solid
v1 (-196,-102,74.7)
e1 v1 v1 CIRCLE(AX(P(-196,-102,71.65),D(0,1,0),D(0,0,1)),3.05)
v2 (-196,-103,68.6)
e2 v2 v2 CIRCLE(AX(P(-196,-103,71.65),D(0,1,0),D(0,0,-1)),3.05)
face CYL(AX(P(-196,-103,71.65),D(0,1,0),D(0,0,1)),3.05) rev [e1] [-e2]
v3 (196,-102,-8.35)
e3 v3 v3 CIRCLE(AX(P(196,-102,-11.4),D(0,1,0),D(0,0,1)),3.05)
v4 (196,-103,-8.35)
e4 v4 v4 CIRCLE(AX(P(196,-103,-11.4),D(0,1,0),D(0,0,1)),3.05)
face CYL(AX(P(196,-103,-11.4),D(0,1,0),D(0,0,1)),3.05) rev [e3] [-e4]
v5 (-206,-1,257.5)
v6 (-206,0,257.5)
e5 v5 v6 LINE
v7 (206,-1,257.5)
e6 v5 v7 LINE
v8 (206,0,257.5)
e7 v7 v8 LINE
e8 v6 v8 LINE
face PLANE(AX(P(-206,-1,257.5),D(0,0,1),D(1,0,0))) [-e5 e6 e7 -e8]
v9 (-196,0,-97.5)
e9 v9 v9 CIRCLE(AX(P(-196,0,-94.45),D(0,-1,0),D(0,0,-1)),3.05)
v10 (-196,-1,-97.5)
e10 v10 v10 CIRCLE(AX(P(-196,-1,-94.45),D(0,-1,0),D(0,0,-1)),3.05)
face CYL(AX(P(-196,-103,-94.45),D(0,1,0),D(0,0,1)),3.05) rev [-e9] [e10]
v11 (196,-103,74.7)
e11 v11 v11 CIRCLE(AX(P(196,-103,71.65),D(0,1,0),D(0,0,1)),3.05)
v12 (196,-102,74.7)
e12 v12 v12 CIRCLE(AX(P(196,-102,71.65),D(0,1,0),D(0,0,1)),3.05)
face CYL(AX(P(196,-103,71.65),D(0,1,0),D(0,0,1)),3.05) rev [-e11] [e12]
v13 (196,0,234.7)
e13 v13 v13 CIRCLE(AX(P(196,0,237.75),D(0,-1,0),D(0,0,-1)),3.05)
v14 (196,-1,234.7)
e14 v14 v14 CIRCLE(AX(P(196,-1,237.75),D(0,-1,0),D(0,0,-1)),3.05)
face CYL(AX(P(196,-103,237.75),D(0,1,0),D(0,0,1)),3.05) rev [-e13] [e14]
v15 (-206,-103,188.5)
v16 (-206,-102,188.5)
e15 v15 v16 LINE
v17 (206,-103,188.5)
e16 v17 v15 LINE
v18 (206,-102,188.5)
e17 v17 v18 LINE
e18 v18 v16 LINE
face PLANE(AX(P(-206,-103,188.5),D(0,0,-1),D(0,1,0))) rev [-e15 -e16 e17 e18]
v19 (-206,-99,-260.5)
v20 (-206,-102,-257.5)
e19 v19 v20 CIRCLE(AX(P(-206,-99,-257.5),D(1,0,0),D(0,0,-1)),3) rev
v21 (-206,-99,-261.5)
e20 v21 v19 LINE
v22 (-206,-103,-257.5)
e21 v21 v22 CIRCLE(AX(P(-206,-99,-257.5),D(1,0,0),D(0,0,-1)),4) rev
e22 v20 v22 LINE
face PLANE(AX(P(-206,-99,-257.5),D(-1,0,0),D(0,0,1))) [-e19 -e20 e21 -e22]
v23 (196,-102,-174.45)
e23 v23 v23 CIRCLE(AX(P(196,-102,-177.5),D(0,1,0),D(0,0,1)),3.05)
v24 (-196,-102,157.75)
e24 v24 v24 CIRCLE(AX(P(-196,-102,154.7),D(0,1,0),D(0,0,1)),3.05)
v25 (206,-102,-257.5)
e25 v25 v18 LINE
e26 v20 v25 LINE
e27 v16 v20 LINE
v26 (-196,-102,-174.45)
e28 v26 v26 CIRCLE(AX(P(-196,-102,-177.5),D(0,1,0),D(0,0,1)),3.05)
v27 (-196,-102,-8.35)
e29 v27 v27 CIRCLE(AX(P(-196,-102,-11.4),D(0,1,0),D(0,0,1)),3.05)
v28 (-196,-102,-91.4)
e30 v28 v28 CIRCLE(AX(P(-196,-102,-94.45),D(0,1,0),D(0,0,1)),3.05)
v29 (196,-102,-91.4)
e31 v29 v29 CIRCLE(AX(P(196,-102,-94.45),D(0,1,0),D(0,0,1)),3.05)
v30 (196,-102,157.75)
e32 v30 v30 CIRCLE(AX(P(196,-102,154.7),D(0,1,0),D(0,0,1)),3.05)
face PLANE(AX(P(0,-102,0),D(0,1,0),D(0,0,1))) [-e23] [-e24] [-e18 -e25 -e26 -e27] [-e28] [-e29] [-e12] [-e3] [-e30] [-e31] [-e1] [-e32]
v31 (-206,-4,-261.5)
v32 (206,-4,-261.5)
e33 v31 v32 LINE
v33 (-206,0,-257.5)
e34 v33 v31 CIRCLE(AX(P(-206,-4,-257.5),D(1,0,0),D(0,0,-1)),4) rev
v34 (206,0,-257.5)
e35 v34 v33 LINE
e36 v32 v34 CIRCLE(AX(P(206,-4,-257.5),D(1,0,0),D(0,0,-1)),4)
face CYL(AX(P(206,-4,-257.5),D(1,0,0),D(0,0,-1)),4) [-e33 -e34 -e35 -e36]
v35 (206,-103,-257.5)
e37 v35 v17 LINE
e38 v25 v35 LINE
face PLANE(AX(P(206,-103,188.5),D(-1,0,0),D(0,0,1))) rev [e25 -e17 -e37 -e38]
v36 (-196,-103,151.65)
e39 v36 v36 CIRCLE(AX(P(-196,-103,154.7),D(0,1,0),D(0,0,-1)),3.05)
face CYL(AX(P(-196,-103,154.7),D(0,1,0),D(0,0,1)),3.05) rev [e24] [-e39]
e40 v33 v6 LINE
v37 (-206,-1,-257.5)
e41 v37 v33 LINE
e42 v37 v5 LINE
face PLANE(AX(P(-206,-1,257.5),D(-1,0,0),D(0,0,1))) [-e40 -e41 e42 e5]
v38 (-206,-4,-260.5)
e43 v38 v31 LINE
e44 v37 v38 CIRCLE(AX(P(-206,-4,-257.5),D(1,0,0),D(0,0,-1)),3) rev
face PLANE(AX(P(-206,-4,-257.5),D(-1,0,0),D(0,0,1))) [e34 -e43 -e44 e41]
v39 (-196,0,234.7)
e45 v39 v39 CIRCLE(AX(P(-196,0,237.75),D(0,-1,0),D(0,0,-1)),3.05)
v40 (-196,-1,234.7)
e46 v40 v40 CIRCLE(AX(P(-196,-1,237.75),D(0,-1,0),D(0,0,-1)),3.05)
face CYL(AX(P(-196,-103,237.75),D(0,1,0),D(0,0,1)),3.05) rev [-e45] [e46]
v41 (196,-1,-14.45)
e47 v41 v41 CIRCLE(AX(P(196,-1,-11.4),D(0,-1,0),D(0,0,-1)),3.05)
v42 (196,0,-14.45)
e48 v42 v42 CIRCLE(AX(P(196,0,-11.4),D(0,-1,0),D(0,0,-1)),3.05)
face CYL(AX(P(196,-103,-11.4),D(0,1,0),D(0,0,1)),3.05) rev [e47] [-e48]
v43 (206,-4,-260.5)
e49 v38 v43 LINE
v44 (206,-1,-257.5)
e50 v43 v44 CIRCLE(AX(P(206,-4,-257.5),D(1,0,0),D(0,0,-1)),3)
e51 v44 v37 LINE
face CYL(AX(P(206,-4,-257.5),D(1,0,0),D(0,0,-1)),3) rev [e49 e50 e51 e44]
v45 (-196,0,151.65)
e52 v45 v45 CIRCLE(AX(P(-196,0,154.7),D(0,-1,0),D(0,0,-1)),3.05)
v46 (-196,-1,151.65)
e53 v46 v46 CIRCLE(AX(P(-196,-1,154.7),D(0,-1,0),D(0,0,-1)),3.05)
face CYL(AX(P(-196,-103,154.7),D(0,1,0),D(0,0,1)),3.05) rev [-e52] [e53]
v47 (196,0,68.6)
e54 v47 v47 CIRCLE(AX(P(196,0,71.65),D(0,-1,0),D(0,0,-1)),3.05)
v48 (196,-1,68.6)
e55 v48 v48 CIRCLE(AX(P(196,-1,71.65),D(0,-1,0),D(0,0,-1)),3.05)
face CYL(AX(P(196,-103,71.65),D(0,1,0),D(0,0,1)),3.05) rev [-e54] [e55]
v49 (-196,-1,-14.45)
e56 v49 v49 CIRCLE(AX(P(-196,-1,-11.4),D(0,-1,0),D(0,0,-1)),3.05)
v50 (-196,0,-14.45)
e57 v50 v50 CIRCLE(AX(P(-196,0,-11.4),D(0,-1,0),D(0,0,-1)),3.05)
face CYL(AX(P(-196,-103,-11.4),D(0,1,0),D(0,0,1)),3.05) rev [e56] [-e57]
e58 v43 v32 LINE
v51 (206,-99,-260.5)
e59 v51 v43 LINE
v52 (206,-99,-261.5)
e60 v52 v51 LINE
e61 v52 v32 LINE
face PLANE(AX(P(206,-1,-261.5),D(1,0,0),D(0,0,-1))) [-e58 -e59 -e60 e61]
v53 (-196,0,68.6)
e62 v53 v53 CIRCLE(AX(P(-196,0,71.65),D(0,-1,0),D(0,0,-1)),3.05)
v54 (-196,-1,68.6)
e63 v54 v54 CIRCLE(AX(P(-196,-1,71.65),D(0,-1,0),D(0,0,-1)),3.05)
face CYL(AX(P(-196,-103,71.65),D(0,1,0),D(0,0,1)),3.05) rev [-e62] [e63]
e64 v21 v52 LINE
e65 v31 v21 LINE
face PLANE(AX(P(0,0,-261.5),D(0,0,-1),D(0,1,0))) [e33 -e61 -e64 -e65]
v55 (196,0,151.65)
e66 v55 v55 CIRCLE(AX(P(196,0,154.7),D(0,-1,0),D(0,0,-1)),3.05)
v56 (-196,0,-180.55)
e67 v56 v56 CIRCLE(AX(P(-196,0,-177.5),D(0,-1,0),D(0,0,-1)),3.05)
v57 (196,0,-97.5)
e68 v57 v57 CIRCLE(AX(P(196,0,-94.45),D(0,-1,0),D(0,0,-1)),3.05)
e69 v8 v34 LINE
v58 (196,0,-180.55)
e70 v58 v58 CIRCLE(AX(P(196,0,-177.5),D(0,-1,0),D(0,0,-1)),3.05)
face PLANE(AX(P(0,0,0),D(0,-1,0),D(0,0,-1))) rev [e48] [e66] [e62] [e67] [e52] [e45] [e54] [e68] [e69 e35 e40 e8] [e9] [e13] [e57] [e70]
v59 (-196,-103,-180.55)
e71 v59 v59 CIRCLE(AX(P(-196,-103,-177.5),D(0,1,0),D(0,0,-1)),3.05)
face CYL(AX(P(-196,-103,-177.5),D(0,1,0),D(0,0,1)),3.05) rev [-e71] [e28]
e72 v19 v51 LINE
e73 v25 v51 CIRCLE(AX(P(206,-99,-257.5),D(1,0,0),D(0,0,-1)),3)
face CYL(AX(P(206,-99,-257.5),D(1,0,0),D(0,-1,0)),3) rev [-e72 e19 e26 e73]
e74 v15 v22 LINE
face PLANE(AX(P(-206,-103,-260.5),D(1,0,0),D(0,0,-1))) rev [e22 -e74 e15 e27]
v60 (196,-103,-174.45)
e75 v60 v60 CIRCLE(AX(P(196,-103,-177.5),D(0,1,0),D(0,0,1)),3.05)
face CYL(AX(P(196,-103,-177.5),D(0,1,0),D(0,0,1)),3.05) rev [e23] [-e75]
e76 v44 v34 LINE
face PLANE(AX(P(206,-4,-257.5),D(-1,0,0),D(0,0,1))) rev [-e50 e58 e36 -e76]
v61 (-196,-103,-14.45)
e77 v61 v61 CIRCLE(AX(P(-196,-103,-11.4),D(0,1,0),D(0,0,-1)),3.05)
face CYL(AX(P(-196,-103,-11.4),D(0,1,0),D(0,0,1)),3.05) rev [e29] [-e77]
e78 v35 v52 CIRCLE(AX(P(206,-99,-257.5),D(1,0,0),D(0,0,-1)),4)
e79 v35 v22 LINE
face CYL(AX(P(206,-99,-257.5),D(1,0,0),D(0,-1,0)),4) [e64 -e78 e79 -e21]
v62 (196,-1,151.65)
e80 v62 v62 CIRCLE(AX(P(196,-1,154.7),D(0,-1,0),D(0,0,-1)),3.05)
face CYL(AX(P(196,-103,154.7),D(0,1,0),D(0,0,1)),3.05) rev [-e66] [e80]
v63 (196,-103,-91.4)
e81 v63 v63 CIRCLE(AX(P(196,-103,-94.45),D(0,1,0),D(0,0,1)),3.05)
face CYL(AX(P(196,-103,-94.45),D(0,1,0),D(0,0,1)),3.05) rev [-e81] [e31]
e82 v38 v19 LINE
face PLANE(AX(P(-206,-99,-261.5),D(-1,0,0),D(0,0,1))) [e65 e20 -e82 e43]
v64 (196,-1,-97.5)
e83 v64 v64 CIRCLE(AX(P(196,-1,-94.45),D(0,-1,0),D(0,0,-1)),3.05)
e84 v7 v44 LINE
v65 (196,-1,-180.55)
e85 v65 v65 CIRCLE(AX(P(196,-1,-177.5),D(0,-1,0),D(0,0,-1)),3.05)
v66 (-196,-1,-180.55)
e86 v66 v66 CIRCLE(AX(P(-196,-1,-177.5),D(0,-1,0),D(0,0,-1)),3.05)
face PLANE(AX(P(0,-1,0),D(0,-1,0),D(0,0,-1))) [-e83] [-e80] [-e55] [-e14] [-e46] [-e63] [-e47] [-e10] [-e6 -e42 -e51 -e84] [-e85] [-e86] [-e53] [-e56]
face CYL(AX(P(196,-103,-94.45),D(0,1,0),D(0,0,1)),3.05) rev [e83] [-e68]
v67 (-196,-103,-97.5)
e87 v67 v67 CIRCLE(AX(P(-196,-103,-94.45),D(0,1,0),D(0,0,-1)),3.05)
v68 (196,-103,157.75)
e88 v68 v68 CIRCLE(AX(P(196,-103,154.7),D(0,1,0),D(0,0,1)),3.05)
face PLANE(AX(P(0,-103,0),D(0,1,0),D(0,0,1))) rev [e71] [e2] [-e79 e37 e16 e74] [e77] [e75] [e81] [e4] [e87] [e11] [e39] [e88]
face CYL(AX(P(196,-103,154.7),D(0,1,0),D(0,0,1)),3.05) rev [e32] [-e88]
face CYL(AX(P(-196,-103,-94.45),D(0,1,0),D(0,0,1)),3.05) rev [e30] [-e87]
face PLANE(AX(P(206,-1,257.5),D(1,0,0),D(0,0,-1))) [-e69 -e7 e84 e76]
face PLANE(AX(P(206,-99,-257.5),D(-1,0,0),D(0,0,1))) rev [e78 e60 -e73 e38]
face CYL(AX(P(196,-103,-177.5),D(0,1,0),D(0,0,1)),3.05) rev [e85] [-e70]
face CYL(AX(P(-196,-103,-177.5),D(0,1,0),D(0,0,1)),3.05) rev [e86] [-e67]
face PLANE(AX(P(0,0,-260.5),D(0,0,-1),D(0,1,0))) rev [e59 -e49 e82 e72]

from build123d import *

# Parameters (mm, degrees)
SKETCH1_W               = 412
SKETCH1_H               = 515
BASE_FLANGE1_DEPTH      = 1
EDGE_FLANGE1_DEPTH      = 412
EDGE_FLANGE2_DEPTH      = 412
CUT_EXTRUDE1_DEPTH      = 349.464130148
CUT_EXTRUDE1_DEPTH_BACK = 349.464130148
SKETCH12_R              = 3.05


# Sheet-metal steps are written as plain solids
with BuildPart() as part:
    # Sketch1 → Base-Flange1 (new body)
    with BuildSketch(Plane(origin=(0, 0, 0), x_dir=(1, 0, 0), z_dir=(0, 1, 0))):
        Rectangle(SKETCH1_W, SKETCH1_H)
    extrude(amount=-BASE_FLANGE1_DEPTH)

    # Edge-Flange1 section (across the edge) → Edge-Flange1 (add)
    with BuildSketch(Plane(origin=(-206, -1, -260.5), x_dir=(0, 0, 1), z_dir=(1, 0, 0))):
        with BuildLine():
            Line((-1, 3), (-1, 98))
            Line((-1, 98), (0, 98))
            Line((0, 98), (0, 3))
            ThreePointArc((0, 3), (0.878679656, 0.878679656), (3, 0))
            Line((3, 0), (3, -1))
            ThreePointArc((3, -1), (0.171572875, 0.171572875), (-1, 3))
        make_face()
    extrude(amount=EDGE_FLANGE1_DEPTH)

    # Edge-Flange2 section (across the edge) → Edge-Flange2 (add)
    with BuildSketch(Plane(origin=(-206, -102, -260.5), x_dir=(0, 1, 0), z_dir=(1, 0, 0))):
        with BuildLine():
            Line((-1, 3), (-1, 449))
            Line((-1, 449), (0, 449))
            Line((0, 449), (0, 3))
            ThreePointArc((0, 3), (0.878679656, 0.878679656), (3, 0))
            Line((3, 0), (3, -1))
            ThreePointArc((3, -1), (0.171572875, 0.171572875), (-1, 3))
        make_face()
    extrude(amount=EDGE_FLANGE2_DEPTH)

    # Sketch12 → Cut-Extrude1 (cut, two sides: drawn at the far end of the back side and taken through both)
    with BuildSketch(Plane(origin=(0, 0, 0), x_dir=(1, 0, 0), z_dir=(0, 1, 0)).offset(-CUT_EXTRUDE1_DEPTH_BACK)):
        with Locations(Location((196, 177.5, 0), (0, 0, 270))):
            Circle(SKETCH12_R)
        with Locations(Location((196, 94.45, 0), (0, 0, 270))):
            Circle(SKETCH12_R)
        with Locations(Location((196, 11.4, 0), (0, 0, 270))):
            Circle(SKETCH12_R)
        with Locations(Location((196, -71.65, 0), (0, 0, 270))):
            Circle(SKETCH12_R)
        with Locations(Location((196, -154.7, 0), (0, 0, 270))):
            Circle(SKETCH12_R)
        with Locations(Location((196, -237.75, 0), (0, 0, 90))):
            Circle(SKETCH12_R)
        with Locations(Location((-196, -237.75, 0), (0, 0, 90))):
            Circle(SKETCH12_R)
        with Locations(Location((-196, -154.7, 0), (0, 0, 270))):
            Circle(SKETCH12_R)
        with Locations(Location((-196, -71.65, 0), (0, 0, 270))):
            Circle(SKETCH12_R)
        with Locations(Location((-196, 11.4, 0), (0, 0, 270))):
            Circle(SKETCH12_R)
        with Locations(Location((-196, 94.45, 0), (0, 0, 270))):
            Circle(SKETCH12_R)
        with Locations(Location((-196, 177.5, 0), (0, 0, 270))):
            Circle(SKETCH12_R)
    extrude(amount=CUT_EXTRUDE1_DEPTH + CUT_EXTRUDE1_DEPTH_BACK, mode=Mode.SUBTRACT)


solid = part.part
